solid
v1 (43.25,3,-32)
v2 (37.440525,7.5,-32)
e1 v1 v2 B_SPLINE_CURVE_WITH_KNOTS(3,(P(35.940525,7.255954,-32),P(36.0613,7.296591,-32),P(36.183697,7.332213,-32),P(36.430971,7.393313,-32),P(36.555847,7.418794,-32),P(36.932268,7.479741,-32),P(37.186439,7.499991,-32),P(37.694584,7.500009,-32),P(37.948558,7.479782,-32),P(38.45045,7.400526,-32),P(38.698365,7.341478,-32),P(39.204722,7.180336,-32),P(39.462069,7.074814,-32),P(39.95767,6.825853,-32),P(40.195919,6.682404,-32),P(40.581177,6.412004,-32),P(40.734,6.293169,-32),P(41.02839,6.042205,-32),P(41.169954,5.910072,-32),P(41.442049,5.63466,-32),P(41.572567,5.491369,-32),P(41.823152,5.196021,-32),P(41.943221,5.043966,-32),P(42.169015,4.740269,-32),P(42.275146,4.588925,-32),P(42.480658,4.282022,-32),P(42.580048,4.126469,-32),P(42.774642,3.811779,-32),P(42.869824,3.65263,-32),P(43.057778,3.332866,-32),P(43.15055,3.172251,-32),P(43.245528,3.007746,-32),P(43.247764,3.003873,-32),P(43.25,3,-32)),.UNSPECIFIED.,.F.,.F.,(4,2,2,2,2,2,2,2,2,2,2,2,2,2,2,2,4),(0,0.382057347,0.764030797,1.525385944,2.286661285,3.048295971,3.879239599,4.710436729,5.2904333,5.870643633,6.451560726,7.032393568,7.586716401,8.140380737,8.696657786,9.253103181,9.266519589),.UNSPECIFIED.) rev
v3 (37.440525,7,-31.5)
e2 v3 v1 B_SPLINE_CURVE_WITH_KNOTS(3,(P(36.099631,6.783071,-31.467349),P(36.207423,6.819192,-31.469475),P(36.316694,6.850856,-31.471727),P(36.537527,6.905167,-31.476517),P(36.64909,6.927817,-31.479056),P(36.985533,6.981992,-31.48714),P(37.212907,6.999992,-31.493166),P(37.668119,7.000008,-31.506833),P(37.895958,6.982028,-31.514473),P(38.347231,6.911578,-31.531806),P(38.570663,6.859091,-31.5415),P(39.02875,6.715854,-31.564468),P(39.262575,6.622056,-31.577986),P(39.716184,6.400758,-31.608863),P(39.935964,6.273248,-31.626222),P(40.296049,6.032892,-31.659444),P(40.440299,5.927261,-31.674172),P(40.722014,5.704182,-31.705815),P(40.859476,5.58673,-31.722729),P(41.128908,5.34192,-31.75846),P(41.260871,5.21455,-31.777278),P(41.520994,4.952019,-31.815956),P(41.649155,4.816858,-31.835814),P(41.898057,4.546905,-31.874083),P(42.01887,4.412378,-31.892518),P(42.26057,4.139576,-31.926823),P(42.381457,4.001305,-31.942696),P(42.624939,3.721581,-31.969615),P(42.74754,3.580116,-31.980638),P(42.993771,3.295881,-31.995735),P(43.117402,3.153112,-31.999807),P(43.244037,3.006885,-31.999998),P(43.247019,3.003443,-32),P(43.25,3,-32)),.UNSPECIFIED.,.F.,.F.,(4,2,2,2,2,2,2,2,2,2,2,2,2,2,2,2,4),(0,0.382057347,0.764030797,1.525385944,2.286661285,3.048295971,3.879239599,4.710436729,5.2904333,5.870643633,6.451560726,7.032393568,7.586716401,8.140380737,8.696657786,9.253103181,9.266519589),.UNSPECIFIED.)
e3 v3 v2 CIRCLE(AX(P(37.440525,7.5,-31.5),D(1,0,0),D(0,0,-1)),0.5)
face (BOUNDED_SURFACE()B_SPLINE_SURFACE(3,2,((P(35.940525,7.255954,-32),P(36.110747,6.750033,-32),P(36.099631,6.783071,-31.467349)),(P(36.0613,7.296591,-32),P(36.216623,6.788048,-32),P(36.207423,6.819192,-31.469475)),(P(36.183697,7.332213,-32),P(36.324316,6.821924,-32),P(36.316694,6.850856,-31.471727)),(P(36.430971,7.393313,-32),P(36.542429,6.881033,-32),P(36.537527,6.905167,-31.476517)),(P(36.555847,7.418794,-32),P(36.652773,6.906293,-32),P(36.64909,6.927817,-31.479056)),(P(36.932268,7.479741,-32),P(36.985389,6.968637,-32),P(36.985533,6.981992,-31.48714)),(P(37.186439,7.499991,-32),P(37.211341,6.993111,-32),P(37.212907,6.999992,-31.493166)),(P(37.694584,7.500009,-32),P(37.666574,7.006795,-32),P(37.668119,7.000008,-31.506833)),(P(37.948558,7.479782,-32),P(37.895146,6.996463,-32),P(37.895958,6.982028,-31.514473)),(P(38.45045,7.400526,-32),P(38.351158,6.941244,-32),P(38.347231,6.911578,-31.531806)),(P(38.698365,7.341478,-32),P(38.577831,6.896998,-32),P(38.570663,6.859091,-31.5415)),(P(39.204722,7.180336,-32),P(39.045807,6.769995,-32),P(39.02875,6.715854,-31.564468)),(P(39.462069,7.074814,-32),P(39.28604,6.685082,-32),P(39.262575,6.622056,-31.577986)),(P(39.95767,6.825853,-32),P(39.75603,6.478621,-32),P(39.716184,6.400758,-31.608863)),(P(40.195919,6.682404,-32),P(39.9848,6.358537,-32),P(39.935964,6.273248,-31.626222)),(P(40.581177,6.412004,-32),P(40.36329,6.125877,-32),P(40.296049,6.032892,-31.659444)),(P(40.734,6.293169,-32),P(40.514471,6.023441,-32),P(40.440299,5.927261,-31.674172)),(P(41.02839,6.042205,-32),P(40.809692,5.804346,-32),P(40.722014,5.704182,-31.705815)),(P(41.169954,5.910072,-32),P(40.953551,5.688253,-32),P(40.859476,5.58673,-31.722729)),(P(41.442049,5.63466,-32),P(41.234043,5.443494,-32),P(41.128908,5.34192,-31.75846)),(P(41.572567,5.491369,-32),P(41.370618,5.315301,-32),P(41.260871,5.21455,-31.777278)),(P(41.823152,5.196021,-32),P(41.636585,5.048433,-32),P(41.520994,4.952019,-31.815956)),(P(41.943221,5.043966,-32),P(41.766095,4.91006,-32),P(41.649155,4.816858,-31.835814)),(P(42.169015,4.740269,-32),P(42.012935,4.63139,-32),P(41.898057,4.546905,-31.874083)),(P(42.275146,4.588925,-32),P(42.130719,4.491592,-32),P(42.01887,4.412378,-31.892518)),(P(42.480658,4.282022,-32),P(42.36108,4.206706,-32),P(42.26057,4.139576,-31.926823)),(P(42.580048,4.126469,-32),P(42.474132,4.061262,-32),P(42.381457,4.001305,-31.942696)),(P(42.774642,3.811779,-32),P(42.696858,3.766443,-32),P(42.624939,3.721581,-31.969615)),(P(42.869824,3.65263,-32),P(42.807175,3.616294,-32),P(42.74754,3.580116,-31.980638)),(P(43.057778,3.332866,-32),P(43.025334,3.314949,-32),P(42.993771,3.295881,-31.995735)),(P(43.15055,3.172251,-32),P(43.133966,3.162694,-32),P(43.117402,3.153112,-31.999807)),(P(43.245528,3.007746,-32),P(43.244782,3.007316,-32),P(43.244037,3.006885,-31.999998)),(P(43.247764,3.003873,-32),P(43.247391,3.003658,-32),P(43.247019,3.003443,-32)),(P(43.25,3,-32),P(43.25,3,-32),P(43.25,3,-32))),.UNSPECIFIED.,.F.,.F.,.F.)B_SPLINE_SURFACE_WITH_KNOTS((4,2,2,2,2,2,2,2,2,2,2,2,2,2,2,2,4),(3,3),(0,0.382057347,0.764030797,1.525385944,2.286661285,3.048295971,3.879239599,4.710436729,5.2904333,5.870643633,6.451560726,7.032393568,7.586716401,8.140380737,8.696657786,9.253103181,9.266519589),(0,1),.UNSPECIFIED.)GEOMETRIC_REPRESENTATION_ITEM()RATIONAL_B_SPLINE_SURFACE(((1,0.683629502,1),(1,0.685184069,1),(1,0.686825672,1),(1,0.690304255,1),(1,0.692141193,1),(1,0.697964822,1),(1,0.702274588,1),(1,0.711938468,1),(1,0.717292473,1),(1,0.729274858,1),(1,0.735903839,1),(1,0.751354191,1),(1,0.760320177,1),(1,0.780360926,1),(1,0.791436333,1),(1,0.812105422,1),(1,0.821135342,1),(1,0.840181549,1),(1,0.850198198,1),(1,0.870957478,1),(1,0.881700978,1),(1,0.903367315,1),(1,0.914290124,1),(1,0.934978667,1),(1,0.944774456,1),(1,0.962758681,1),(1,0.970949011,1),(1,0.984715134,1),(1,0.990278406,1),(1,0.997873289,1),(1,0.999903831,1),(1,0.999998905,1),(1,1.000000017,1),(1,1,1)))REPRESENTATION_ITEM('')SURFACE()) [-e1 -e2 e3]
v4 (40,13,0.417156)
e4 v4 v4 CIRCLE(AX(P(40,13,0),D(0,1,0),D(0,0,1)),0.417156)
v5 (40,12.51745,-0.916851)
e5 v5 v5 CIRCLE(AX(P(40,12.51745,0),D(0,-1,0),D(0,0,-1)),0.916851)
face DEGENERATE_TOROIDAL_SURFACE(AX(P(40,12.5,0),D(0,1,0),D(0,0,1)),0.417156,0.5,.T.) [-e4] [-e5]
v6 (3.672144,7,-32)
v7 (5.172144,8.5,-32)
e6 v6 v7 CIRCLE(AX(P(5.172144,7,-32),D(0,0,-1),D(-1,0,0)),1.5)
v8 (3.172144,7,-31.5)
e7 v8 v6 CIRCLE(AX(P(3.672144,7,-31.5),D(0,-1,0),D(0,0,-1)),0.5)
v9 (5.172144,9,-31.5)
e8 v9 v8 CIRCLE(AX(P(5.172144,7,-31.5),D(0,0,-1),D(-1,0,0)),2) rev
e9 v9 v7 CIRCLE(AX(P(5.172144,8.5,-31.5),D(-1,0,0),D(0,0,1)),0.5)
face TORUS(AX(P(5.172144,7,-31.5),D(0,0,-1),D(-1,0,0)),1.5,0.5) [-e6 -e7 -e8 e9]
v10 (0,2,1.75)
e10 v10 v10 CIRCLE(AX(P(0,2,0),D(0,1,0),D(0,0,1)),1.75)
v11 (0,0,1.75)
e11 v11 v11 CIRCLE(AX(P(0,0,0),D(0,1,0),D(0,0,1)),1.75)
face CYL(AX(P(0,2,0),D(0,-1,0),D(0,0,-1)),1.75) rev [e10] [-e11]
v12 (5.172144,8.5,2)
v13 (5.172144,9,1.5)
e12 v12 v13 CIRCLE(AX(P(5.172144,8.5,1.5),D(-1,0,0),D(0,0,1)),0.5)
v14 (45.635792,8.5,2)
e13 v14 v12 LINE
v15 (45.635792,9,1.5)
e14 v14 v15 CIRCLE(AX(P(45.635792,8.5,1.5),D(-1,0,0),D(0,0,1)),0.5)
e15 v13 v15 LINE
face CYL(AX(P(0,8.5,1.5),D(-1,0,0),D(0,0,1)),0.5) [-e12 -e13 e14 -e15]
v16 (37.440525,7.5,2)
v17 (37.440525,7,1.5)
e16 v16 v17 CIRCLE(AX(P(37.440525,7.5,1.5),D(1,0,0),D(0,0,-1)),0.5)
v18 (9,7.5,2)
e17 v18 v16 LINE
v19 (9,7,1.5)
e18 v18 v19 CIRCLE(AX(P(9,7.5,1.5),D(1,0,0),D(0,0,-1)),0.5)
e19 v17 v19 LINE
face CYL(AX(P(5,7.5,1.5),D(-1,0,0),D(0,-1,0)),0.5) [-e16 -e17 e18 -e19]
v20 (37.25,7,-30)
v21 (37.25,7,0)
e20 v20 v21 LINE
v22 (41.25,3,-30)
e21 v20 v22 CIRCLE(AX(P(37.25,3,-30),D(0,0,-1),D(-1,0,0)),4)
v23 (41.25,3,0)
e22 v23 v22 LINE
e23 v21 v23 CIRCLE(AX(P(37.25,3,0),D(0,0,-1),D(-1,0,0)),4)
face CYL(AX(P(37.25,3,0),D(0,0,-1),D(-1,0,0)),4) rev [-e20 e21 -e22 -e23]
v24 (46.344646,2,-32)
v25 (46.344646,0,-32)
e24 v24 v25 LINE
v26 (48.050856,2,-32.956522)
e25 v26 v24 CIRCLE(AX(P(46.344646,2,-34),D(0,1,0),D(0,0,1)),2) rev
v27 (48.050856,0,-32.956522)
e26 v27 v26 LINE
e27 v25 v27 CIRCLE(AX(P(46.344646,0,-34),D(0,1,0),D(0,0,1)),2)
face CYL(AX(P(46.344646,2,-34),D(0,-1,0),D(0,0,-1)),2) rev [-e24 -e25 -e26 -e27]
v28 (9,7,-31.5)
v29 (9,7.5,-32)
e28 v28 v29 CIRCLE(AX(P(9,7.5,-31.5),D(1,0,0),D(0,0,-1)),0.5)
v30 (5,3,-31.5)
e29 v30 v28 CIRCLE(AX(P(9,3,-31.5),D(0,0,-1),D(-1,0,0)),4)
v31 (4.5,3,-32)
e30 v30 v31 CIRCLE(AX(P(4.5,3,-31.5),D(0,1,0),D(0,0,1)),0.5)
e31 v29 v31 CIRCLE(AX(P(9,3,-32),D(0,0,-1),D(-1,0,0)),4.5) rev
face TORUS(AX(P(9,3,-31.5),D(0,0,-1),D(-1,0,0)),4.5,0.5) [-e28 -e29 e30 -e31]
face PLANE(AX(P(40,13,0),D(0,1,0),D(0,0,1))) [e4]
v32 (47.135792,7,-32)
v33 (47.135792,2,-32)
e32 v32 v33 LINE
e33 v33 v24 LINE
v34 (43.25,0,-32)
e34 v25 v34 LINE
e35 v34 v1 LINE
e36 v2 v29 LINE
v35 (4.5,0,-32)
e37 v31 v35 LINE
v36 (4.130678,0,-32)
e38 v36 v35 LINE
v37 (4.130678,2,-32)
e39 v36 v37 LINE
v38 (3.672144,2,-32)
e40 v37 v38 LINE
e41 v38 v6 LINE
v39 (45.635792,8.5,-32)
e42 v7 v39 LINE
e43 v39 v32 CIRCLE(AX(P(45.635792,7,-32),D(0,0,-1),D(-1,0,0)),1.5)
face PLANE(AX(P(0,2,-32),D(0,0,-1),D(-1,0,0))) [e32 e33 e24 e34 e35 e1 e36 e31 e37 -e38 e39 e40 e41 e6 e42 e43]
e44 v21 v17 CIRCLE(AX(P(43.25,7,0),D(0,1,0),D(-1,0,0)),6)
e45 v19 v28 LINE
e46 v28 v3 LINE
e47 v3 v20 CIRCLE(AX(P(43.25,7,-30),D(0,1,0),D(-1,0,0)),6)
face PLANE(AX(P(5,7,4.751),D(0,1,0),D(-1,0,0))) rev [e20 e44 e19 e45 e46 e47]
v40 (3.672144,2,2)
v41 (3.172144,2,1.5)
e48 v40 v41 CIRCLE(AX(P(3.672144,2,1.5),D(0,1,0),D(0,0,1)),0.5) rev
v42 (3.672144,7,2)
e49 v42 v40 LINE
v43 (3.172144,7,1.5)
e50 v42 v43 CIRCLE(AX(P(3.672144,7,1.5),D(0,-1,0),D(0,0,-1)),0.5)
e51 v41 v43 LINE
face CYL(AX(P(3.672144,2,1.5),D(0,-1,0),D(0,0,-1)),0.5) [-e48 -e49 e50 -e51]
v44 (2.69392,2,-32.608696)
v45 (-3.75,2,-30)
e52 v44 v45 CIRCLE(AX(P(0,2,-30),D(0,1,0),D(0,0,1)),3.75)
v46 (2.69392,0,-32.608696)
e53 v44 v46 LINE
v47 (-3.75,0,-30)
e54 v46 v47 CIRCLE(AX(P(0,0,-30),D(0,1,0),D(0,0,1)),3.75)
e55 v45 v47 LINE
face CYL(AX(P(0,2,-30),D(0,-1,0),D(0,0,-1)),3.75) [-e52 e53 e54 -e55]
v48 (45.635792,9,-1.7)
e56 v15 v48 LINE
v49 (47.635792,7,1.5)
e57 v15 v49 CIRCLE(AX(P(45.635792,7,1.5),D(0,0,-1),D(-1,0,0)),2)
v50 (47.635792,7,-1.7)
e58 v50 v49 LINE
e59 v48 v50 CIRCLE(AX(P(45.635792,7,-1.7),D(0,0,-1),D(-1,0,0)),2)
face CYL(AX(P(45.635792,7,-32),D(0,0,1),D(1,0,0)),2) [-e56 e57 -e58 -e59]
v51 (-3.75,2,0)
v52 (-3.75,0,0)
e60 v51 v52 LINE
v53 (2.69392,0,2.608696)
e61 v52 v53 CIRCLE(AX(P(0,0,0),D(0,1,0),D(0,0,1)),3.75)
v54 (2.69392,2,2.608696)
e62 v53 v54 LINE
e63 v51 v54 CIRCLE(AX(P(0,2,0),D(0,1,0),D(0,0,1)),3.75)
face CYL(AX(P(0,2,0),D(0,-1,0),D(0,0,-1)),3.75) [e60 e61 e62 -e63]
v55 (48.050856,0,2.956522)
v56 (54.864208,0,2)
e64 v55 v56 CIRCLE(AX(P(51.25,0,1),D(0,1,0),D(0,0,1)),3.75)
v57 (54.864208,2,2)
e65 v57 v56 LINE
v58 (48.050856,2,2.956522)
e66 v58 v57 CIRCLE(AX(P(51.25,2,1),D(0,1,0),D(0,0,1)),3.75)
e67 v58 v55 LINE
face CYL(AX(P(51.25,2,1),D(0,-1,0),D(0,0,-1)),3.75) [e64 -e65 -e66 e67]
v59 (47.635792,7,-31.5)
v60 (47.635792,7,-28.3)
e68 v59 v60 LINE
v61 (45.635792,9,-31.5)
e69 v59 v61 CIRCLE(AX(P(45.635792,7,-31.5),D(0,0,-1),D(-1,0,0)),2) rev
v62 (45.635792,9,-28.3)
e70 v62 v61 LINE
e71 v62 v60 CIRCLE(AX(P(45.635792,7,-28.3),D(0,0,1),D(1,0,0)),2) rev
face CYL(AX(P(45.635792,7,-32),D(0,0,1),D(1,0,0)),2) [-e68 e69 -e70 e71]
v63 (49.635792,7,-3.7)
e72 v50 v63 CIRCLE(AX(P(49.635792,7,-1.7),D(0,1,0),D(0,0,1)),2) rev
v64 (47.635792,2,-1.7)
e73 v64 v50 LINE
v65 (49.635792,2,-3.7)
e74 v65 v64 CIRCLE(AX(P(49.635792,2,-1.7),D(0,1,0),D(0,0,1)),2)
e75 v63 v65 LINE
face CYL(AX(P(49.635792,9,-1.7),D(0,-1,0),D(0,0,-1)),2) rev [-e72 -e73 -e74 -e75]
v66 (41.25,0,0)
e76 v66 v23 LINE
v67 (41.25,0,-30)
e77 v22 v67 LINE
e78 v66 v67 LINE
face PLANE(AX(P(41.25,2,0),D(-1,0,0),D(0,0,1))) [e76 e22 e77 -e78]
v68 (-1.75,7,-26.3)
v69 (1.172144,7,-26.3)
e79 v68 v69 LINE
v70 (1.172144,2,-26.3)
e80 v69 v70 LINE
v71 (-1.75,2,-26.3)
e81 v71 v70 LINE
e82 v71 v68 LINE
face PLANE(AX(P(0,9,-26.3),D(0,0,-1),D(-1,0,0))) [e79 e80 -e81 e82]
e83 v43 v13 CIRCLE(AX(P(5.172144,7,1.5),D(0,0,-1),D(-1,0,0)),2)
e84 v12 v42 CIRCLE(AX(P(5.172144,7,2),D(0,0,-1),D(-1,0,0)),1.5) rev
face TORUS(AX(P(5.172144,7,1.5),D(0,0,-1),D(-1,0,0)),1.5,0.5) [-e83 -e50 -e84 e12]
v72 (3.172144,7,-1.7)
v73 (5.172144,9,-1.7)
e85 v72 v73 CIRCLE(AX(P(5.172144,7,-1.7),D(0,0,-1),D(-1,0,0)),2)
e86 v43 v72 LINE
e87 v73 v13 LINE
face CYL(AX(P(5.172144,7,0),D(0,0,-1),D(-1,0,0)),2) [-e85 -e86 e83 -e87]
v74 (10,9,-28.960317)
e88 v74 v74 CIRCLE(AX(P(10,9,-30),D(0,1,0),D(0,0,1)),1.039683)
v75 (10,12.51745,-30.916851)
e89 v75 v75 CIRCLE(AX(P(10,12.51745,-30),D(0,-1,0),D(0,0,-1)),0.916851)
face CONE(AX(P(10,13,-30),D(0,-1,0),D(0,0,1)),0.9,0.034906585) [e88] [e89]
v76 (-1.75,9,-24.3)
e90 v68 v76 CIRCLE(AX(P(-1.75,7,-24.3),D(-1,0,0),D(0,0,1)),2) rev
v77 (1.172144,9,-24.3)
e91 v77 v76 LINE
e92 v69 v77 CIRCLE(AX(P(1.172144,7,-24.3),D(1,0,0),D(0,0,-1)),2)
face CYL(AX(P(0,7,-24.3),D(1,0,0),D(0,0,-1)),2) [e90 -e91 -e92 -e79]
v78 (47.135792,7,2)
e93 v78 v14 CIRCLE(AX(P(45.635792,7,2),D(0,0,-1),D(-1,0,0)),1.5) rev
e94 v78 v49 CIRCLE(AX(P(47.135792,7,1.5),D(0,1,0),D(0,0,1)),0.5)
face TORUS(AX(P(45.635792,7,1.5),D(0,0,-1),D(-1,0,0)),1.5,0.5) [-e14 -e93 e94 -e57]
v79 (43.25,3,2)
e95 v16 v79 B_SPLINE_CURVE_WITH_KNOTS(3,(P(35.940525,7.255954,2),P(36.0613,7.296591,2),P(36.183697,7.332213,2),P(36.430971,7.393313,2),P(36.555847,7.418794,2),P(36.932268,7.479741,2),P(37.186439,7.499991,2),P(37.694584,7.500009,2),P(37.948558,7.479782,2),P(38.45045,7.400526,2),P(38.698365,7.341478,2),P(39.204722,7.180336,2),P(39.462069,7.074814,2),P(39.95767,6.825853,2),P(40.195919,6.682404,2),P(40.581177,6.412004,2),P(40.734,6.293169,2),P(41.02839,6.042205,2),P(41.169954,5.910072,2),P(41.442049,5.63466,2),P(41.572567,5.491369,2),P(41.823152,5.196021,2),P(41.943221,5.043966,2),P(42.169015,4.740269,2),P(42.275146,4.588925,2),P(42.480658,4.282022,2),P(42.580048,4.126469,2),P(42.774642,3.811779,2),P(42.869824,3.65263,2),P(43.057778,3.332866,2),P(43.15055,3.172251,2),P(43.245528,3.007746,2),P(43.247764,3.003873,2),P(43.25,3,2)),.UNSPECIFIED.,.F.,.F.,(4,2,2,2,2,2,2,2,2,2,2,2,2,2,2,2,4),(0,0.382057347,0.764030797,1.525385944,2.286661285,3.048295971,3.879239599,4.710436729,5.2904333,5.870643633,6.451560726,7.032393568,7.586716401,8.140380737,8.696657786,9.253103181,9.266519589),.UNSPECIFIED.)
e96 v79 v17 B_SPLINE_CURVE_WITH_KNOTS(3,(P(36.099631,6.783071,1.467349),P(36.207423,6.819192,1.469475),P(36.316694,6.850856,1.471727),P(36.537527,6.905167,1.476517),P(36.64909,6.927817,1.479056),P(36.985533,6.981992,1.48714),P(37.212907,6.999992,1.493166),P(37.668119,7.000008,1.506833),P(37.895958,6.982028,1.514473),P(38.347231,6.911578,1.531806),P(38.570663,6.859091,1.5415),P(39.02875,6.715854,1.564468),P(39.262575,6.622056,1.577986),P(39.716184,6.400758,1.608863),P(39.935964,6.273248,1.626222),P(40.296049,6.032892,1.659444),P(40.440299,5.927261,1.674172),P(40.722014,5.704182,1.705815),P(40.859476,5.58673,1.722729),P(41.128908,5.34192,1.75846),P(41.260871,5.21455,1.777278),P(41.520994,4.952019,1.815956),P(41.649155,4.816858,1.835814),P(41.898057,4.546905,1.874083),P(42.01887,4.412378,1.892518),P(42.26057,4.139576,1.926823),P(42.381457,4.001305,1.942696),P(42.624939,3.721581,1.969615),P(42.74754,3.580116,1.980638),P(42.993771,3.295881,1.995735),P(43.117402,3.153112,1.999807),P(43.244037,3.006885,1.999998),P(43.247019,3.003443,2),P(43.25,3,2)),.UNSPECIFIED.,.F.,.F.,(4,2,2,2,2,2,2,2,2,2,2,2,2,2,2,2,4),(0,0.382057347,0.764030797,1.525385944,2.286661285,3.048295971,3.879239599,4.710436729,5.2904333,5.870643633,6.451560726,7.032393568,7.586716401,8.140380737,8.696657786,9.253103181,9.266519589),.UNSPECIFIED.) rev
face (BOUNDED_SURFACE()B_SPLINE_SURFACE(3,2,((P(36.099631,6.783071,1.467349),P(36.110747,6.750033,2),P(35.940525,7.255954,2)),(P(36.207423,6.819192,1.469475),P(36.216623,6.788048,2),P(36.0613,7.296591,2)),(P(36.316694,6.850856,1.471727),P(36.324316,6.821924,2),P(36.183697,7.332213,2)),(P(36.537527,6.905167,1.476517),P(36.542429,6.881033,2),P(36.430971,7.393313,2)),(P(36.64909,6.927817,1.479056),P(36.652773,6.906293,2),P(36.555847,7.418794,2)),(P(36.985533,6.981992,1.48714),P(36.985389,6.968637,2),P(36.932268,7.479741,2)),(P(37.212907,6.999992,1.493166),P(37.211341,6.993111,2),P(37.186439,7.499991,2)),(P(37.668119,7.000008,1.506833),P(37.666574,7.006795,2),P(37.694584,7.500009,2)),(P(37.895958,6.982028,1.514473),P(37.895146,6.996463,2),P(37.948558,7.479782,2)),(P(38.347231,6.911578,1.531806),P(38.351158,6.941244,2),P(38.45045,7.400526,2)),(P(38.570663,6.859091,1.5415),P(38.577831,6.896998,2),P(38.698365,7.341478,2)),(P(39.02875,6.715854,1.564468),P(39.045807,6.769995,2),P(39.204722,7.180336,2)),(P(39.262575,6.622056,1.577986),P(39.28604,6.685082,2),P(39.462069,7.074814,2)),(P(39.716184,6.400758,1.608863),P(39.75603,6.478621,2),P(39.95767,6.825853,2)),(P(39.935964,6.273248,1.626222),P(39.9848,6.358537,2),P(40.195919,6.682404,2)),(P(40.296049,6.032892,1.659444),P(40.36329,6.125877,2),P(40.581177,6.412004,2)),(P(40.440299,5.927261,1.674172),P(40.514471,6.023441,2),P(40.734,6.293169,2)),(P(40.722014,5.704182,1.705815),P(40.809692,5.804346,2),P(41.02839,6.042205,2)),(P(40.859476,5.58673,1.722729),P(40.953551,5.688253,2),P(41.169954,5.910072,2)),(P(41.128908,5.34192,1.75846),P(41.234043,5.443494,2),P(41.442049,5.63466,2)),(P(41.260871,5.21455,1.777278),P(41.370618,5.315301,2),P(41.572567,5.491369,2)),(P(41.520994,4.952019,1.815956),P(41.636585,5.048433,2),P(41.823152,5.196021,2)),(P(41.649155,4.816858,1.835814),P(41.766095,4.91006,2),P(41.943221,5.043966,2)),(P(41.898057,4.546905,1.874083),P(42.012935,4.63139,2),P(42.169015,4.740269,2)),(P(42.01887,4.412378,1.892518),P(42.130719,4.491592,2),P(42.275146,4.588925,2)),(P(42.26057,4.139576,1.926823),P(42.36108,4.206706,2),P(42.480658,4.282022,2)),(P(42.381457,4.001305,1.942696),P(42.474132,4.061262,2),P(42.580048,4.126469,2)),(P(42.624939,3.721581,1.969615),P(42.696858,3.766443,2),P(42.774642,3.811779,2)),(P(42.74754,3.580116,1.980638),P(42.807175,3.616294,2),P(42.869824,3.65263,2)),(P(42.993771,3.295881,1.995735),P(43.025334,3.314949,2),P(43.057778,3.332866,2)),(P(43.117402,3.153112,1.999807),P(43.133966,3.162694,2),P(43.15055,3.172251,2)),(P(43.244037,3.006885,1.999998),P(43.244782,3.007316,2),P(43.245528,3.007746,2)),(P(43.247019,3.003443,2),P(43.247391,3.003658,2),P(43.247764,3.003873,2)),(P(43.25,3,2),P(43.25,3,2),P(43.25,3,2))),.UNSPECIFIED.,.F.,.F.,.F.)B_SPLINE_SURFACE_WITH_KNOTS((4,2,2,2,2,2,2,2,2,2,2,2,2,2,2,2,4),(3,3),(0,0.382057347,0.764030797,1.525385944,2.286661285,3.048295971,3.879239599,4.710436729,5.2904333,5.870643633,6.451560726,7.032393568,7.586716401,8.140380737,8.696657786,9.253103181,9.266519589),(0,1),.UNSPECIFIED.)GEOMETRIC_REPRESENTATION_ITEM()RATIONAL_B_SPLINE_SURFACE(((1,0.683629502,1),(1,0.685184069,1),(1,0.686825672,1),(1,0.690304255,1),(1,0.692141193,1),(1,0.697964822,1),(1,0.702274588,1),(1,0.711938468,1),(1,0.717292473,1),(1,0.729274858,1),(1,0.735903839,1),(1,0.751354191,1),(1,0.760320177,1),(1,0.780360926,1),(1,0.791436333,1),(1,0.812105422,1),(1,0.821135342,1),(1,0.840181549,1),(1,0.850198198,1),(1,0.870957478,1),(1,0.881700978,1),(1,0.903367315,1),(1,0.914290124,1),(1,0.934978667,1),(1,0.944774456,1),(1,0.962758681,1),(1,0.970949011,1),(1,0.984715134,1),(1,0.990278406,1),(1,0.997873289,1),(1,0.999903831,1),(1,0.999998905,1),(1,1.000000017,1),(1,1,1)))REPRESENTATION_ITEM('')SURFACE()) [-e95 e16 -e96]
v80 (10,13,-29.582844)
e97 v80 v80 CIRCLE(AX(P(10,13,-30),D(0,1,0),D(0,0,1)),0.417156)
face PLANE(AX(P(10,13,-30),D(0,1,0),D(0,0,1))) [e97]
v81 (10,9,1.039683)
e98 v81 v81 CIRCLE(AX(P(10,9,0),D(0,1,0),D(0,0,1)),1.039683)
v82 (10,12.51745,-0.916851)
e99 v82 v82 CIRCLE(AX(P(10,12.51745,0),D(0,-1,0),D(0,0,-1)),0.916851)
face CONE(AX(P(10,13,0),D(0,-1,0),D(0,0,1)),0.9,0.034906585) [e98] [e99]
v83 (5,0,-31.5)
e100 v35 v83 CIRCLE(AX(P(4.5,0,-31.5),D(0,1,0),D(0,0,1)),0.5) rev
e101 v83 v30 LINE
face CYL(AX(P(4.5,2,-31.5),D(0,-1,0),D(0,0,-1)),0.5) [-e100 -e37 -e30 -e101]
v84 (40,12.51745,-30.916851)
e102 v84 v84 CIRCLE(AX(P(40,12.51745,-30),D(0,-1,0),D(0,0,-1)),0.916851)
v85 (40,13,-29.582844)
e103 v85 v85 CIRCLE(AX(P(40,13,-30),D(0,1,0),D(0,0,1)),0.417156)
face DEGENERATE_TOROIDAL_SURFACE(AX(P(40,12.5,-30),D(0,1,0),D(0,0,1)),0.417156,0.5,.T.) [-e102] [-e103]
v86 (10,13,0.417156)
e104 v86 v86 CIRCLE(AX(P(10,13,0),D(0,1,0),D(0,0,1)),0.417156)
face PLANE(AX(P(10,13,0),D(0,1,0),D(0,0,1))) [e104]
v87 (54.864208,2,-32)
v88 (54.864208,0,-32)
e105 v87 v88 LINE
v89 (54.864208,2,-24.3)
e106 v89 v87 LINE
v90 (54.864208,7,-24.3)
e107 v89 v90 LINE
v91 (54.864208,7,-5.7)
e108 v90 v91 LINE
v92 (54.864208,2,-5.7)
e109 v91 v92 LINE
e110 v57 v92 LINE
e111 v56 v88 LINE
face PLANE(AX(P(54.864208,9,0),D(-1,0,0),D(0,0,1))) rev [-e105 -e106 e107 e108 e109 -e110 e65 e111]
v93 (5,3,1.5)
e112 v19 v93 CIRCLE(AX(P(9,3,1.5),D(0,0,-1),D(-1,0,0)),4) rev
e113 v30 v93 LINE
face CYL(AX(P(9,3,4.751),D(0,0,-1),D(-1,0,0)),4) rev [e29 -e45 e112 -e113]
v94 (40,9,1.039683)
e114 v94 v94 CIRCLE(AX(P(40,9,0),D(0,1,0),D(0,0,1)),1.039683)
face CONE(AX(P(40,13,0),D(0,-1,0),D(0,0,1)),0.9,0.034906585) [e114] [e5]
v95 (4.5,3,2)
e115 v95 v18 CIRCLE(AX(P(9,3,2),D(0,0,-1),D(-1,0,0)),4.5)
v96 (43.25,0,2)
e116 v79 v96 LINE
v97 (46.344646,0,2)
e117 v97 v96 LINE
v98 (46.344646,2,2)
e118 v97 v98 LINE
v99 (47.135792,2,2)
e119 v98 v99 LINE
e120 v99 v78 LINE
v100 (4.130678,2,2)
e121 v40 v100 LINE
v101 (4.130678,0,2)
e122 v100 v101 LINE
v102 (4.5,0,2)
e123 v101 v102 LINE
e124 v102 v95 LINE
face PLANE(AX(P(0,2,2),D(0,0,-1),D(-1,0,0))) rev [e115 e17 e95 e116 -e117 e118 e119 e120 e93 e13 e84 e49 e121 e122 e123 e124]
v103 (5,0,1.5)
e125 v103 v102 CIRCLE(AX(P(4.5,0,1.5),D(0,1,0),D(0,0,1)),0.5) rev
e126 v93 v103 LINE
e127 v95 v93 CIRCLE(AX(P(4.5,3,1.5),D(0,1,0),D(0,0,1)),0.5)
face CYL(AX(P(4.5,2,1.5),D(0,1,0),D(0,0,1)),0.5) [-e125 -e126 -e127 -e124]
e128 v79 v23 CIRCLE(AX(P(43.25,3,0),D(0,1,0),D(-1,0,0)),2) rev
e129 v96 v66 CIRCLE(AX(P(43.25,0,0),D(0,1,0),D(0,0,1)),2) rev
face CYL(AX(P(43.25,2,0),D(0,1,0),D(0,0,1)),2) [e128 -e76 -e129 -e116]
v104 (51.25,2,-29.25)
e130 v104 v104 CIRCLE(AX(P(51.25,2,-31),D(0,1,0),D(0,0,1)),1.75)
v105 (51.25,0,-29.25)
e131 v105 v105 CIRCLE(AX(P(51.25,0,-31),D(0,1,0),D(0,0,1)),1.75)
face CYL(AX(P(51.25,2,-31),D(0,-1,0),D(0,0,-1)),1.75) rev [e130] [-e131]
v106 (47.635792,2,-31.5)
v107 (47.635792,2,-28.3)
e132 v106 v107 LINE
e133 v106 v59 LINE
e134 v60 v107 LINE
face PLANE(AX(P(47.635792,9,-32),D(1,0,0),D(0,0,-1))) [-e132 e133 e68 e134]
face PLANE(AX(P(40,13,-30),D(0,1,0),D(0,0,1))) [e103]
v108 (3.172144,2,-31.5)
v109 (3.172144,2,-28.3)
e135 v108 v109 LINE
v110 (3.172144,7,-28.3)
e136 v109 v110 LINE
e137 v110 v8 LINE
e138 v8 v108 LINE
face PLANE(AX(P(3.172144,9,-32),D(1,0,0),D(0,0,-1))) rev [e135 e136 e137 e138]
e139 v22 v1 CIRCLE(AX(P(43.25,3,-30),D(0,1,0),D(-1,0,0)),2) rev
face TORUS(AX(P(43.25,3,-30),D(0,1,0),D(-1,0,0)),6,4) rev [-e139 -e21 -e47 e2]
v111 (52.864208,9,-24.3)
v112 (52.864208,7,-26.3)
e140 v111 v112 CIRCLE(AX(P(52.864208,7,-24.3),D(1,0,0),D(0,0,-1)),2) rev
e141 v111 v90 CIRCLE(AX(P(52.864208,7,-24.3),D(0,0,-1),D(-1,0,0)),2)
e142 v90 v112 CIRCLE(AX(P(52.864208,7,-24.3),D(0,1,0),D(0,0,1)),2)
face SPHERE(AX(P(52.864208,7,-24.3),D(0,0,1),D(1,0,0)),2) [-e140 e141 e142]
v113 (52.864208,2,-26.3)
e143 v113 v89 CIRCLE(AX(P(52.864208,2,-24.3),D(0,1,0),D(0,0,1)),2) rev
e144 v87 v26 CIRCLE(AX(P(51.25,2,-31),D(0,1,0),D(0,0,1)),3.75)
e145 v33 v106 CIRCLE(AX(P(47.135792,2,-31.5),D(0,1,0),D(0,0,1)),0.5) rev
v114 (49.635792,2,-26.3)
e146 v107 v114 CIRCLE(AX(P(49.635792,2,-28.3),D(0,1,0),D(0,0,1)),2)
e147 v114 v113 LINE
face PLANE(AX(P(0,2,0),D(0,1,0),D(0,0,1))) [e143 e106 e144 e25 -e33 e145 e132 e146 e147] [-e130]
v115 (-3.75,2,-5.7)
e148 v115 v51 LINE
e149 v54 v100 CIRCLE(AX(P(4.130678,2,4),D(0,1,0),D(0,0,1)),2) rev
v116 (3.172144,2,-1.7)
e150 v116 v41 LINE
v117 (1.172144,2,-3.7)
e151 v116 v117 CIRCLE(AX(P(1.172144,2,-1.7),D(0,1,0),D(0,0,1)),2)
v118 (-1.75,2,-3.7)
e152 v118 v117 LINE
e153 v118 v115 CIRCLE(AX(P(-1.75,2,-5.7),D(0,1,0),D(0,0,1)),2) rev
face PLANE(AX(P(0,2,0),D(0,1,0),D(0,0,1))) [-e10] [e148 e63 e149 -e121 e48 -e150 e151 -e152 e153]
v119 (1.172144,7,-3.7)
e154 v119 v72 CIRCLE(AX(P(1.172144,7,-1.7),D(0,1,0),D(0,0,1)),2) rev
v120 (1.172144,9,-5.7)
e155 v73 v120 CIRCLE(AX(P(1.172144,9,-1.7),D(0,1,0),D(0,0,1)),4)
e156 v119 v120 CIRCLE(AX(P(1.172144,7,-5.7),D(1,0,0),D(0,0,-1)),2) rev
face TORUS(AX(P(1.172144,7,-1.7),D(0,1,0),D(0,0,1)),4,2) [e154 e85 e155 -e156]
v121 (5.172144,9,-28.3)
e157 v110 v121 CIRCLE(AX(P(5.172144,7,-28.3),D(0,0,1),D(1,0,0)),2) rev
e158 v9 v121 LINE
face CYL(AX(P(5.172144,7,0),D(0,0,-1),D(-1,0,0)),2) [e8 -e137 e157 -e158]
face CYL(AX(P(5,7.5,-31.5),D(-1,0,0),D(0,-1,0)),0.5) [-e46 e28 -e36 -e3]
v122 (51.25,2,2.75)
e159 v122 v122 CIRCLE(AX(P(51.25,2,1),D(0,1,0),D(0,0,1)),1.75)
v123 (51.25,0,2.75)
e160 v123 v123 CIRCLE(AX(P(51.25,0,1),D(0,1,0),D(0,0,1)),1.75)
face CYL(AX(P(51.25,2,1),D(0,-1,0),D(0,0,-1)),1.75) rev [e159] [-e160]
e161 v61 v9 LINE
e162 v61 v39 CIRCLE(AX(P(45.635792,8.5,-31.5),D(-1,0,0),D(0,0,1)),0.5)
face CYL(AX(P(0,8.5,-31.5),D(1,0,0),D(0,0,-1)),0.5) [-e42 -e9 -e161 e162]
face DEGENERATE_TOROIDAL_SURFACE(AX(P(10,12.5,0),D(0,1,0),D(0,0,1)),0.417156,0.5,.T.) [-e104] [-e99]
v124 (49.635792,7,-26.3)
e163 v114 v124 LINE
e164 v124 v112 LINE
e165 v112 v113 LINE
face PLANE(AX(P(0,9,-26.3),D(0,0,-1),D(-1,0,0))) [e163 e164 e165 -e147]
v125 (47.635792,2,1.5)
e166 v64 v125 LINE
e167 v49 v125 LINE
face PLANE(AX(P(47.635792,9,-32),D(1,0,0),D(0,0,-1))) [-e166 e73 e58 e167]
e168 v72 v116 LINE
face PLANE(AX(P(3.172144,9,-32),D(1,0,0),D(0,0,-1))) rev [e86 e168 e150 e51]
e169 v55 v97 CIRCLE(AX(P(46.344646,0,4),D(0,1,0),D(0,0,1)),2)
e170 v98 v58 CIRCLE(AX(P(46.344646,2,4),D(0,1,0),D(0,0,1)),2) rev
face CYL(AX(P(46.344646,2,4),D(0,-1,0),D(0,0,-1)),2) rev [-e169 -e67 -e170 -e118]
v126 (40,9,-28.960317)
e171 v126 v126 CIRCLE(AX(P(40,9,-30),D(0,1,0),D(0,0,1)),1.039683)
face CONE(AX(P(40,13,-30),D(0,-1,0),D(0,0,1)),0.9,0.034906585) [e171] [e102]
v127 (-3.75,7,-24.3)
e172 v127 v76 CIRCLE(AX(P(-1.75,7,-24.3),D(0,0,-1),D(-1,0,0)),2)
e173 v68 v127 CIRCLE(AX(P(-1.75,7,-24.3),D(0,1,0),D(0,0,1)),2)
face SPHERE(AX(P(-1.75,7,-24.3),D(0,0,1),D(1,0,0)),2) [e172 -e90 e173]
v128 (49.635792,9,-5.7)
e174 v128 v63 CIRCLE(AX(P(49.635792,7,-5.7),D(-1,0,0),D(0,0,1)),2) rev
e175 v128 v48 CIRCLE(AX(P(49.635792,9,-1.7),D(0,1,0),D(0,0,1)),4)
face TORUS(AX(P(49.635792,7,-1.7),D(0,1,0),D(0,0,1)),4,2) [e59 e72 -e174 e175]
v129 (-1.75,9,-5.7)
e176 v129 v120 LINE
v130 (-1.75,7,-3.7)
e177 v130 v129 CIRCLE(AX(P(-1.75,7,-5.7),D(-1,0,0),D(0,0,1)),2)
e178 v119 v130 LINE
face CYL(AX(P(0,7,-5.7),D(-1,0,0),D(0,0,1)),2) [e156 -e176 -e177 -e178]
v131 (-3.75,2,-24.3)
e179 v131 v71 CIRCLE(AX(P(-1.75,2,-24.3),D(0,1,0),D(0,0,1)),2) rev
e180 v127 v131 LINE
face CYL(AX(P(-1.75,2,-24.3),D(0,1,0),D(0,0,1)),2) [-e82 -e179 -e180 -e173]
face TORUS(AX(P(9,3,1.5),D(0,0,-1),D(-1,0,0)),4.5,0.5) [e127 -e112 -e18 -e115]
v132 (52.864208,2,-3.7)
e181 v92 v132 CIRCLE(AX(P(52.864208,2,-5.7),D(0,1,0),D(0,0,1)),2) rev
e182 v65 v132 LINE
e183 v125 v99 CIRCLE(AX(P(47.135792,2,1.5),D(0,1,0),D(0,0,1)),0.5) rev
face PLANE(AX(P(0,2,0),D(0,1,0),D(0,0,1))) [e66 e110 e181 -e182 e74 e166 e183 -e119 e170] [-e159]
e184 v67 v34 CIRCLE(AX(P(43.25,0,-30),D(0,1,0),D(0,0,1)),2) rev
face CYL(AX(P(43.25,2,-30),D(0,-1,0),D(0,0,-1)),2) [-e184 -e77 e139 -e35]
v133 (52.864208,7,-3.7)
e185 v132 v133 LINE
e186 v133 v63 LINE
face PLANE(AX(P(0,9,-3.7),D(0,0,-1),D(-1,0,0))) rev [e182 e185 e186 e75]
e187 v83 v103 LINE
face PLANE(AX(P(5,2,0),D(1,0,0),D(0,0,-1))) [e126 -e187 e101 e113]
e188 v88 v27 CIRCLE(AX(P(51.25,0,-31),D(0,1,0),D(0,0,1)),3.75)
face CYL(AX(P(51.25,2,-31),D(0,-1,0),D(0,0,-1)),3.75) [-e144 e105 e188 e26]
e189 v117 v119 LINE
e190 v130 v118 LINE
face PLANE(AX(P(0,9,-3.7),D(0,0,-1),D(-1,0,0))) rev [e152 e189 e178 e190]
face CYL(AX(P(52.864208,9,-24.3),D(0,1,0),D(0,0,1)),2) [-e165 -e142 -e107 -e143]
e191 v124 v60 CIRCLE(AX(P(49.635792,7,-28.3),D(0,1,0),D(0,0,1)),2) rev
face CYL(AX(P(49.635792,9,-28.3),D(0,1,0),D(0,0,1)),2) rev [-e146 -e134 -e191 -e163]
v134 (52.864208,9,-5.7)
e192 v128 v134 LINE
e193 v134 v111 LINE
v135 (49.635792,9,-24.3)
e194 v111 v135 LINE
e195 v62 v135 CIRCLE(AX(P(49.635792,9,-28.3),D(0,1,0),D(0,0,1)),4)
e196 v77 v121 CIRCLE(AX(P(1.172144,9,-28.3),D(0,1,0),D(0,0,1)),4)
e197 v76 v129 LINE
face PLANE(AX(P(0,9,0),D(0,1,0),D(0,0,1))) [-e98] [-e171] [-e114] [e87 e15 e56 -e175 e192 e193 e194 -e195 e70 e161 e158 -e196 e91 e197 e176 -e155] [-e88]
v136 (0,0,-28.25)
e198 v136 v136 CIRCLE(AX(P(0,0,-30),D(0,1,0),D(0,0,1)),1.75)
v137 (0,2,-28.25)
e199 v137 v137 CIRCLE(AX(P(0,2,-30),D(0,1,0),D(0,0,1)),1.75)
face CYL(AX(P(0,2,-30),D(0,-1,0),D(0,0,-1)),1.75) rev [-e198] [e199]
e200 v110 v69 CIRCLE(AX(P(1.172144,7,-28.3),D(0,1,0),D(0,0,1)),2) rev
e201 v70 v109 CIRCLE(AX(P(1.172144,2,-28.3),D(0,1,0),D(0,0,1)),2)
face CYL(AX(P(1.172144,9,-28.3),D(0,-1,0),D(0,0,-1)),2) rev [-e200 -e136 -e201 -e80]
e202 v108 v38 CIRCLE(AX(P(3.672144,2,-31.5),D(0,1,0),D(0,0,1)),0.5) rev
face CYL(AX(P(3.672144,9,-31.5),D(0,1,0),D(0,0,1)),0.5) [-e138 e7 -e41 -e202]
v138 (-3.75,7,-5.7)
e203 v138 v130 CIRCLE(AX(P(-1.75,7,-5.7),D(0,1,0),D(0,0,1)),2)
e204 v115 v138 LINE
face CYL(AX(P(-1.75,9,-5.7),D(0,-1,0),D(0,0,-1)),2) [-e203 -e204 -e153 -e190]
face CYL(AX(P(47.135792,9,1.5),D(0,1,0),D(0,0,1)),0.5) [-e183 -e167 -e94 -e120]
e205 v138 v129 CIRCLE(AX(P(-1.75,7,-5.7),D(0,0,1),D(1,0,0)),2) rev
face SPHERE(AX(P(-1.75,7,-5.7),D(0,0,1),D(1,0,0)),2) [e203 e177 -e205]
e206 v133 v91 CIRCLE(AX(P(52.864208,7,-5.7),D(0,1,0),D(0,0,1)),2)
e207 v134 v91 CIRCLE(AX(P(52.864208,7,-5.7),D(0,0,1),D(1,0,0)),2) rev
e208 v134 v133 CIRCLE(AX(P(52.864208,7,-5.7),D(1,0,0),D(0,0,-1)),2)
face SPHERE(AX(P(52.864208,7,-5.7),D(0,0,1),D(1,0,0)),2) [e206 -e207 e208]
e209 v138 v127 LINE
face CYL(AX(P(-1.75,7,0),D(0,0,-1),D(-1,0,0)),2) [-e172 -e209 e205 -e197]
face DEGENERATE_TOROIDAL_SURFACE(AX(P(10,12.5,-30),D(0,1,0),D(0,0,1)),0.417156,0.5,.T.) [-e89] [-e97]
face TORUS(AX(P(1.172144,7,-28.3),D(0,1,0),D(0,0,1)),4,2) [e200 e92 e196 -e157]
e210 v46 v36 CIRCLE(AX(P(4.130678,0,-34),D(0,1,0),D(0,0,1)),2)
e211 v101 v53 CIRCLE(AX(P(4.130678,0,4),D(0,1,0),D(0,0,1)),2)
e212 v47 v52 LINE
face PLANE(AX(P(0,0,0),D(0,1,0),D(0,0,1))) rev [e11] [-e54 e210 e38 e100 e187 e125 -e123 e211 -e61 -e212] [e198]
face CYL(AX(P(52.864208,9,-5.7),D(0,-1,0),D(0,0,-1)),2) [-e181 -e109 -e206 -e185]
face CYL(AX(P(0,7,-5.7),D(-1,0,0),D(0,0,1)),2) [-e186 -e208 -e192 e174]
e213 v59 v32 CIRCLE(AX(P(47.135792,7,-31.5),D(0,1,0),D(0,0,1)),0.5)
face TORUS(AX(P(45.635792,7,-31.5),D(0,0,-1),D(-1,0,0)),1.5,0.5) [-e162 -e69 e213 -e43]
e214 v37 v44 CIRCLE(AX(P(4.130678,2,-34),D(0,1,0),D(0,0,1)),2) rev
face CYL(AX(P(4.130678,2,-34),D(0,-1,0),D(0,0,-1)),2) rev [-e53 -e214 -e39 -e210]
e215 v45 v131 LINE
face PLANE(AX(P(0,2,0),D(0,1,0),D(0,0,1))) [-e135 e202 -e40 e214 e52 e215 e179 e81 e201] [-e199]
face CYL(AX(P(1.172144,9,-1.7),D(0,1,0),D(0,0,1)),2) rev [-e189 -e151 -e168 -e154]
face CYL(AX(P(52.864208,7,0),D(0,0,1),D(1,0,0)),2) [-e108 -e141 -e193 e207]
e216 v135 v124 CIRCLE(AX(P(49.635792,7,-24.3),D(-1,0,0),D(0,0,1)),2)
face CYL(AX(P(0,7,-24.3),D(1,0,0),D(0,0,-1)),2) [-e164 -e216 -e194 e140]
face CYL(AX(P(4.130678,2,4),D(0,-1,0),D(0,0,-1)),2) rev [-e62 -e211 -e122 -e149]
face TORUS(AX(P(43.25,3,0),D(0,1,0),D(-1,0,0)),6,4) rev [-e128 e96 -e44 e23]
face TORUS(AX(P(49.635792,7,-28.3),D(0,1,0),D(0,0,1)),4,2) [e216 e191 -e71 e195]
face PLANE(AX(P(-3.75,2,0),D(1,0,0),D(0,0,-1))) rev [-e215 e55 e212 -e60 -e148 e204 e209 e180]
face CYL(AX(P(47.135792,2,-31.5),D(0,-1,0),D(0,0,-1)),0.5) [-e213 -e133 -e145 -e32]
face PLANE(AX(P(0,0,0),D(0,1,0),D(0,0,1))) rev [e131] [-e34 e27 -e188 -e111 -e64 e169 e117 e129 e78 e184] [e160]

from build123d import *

# Parameters (mm, degrees)
SKETCH1_R             = 1.75
BOSS_EXTRUDE1_DEPTH   = 2
BOSS_EXTRUDE1_2_DEPTH = 2
BOSS_EXTRUDE2_DEPTH   = 7
CUT_EXTRUDE1_REACH    = 68.646
SKETCH4_W             = 36.25
SKETCH4_H             = 7
SKETCH5_R             = 0.9
BOSS_EXTRUDE3_DEPTH   = 4
FILLET1_R             = 2
FILLET2_R             = 4
FILLET3_R             = 0.5
DRAFT4_ANGLE          = 2
FILLET4_R             = 0.5


with BuildPart() as part:
    # Sketch1 → Boss-Extrude1 (new body)
    with BuildSketch(Plane(origin=(0, 0, 0), x_dir=(1, 0, 0), z_dir=(0, 1, 0))):
        with BuildLine():
            Line((-3.75, 30), (-3.75, 0))
            ThreePointArc((-3.75, 0), (-1.040903107, -3.602640798), (3.172144385, -2))
            Line((3.172144385, -2), (5, -2))
            Line((5, -2), (5, 32))
            Line((5, 32), (3.172144385, 32))
            ThreePointArc((3.172144385, 32), (-1.040903107, 33.602640798), (-3.75, 30))
        make_face()
        with Locations(Location((0, 30, 0), (0, 0, 270))):
            Circle(SKETCH1_R, mode=Mode.SUBTRACT)
        with Locations(Location((0, 0, 0), (0, 0, 270))):
            Circle(SKETCH1_R, mode=Mode.SUBTRACT)
    extrude(amount=BOSS_EXTRUDE1_DEPTH)



with BuildPart() as body_2:
    # Sketch1 → Boss-Extrude1 2 (new body)
    with BuildSketch(Plane(origin=(0, 0, 0), x_dir=(1, 0, 0), z_dir=(0, 1, 0))):
        with BuildLine():
            Line((54.864208074, -2), (54.864208074, 32))
            ThreePointArc((54.864208074, 32), (51.25, 34.75), (47.635791926, 32))
            Line((47.635791926, 32), (41.25, 32))
            Line((41.25, 32), (41.25, -2))
            Line((41.25, -2), (47.635791926, -2))
            ThreePointArc((47.635791926, -2), (51.25, -4.75), (54.864208074, -2))
        make_face()
        with Locations(Location((51.25, 31, 0), (0, 0, 270))):
            Circle(SKETCH1_R, mode=Mode.SUBTRACT)
        with Locations(Location((51.25, -1, 0), (0, 0, 270))):
            Circle(SKETCH1_R, mode=Mode.SUBTRACT)
    extrude(amount=BOSS_EXTRUDE1_2_DEPTH)


with BuildPart() as part_1:
    add(part.part)

    add(body_2.part)  # Boss-Extrude2 merges body 2
    # Sketch3 → Boss-Extrude2 (add)
    with BuildSketch(Plane(origin=(0, 2, 0), x_dir=(1, 0, 0), z_dir=(0, 1, 0))):
        Polygon((47.635791926, 32), (3.172144385, 32), (3.172144385, 26.3), (-3.75, 26.3), (-3.75, 3.7), (3.172144385, 3.7), (3.172144385, -2), (47.635791926, -2), (47.635791926, 3.7), (54.864208074, 3.7), (54.864208074, 26.3), (47.635791926, 26.3), align=None)
    extrude(amount=BOSS_EXTRUDE2_DEPTH)

    # Sketch4 → Cut-Extrude1 (cut, up to next)
    with BuildSketch(Plane(origin=(0, 0, -32), x_dir=(-1, 0, 0), z_dir=(0, 0, -1)), mode=Mode.PRIVATE) as cut_extrude1_sk1:
        with Locations((-23.125, 3.5)):
            Rectangle(SKETCH4_W, SKETCH4_H)
    cut_extrude1_tool1 = extrude(cut_extrude1_sk1.sketch, amount=-CUT_EXTRUDE1_REACH, mode=Mode.PRIVATE) & part_1.part
    add(cut_extrude1_tool1.solids().sort_by_distance((23.125, 3.5, -32))[0], mode=Mode.SUBTRACT)

    # Sketch5 → Boss-Extrude3 (add)
    with BuildSketch(Plane(origin=(0, 9, 0), x_dir=(1, 0, 0), z_dir=(0, 1, 0))):
        with Locations(Location((10, 30, 0), (0, 0, 270))):
            Circle(SKETCH5_R)
        with Locations(Location((10, 0, 0), (0, 0, 270))):
            Circle(SKETCH5_R)
        with Locations(Location((40, 0, 0), (0, 0, 270))):
            Circle(SKETCH5_R)
        with Locations(Location((40, 30, 0), (0, 0, 270))):
            Circle(SKETCH5_R)
    extrude(amount=BOSS_EXTRUDE3_DEPTH)

    # Fillet1
    # the kernel refuses this fillet: 2 mm, written as the material it adds along each edge
    with BuildSketch(Plane(origin=(47.635791926, 0, -32), x_dir=(-1, 0, 0), z_dir=(0, 1, 0))) as fillet1_piece_1:
        with BuildLine():
            CenterArc((1.291146144, -2), FILLET1_R, 90, 58.551018611)
            ThreePointArc((-0.415064019, -0.956521739), (-0.17412446, -0.492757426), (0, 0))
            Line((0, 0), (1.291146144, 0))
        make_face()
    extrude(amount=2)
    with BuildSketch(Plane(origin=(47.635791926, 0, 2), x_dir=(-1, 0, 0), z_dir=(0, 1, 0))) as fillet1_piece_2:
        with BuildLine():
            CenterArc((1.291146144, 2), FILLET1_R, 211.448981389, 58.551018611)
            ThreePointArc((-0.415064019, 0.956521739), (-0.17412446, 0.492757426), (0, 0))
            Line((0, 0), (1.291146144, 0))
        make_face()
    extrude(amount=2)
    with BuildSketch(Plane(origin=(3.172144385, 0, 2), x_dir=(-0.6177921091095272, 0, 0.7863414715770763), z_dir=(0, 1, 0))) as fillet1_piece_3:
        with BuildLine():
            CenterArc((0.980508495, 1.989318881), FILLET1_R, 218.155081242, 45.920790152)
            Line((-0.592174448, 0.753734663), (0, 0))
            ThreePointArc((0, 0), (0.387042827, 0.020027098), (0.774085654, 0))
        make_face()
    extrude(amount=2)
    with BuildSketch(Plane(origin=(3.172144385, 0, -32), x_dir=(-0.617792109109531, 0, -0.7863414715770733), z_dir=(0, 1, 0))) as fillet1_piece_4:
        with BuildLine():
            CenterArc((0.980508495, -1.989318881), FILLET1_R, 95.924128606, 45.920790152)
            Line((-0.592174448, -0.753734663), (0, 0))
            ThreePointArc((0, 0), (0.387042827, -0.020027098), (0.774085654, 0))
        make_face()
    extrude(amount=2)
    with BuildSketch(Plane(origin=(3.172144385, 2, -26.3), x_dir=(0, 0, -1), z_dir=(0, 1, 0)), Plane(origin=(3.172144385, 2, -3.7), x_dir=(-1, 0, 0), z_dir=(0, 1, 0))) as fillet1_piece_5:
        with BuildLine():
            CenterArc((FILLET1_R, FILLET1_R), FILLET1_R, 180, 90)
            Line((0, FILLET1_R), (0, 0))
            Line((0, 0), (FILLET1_R, 0))
        make_face()
    extrude(amount=7)
    with BuildSketch(Plane(origin=(47.635791926, 2, -26.3), x_dir=(0, 0, -1), z_dir=(0, 1, 0)), Plane(origin=(47.635791926, 2, -3.7), x_dir=(1, 0, 0), z_dir=(0, 1, 0))) as fillet1_piece_6:
        with BuildLine():
            CenterArc((FILLET1_R, -FILLET1_R), FILLET1_R, 90, 90)
            Line((0, -FILLET1_R), (0, 0))
            Line((0, 0), (FILLET1_R, 0))
        make_face()
    extrude(amount=7)
    # the kernel refuses this fillet: 2 mm, written as the material it takes off along each edge
    with BuildSketch(Plane(origin=(41.25, -5, 2), x_dir=(1, 0, 0), z_dir=(0, 1, 0)), Plane(origin=(-3.75, 2, -26.3), x_dir=(0, 0, 1), z_dir=(0, 1, 0))) as fillet1_2_piece_1:
        with BuildLine():
            CenterArc((FILLET1_R, FILLET1_R), FILLET1_R, 180, 90)
            Line((0, FILLET1_R), (0, 0))
            Line((0, 0), (FILLET1_R, 0))
        make_face()
    extrude(amount=12, mode=Mode.SUBTRACT)
    with BuildSketch(Plane(origin=(41.25, -5, -32), x_dir=(1, 0, 0), z_dir=(0, 1, 0)), Plane(origin=(54.864208074, 2, -3.7), x_dir=(-1, 0, 0), z_dir=(0, 1, 0)), Plane(origin=(54.864208074, 2, -26.3), x_dir=(0, 0, 1), z_dir=(0, 1, 0)), Plane(origin=(-3.75, 2, -3.7), x_dir=(0, 0, -1), z_dir=(0, 1, 0))) as fillet1_2_piece_2:
        with BuildLine():
            CenterArc((FILLET1_R, -FILLET1_R), FILLET1_R, 90, 90)
            Line((0, -FILLET1_R), (0, 0))
            Line((0, 0), (FILLET1_R, 0))
        make_face()
    extrude(amount=12, mode=Mode.SUBTRACT)
    with BuildSketch(Plane(origin=(54.864208074, 9, 1.3), x_dir=(-1, 0, 0), z_dir=(0, 0, -1))) as fillet1_2_piece_3:
        with BuildLine():
            CenterArc((FILLET1_R, -FILLET1_R), FILLET1_R, 90, 90)
            Line((0, -FILLET1_R), (0, 0))
            Line((0, 0), (FILLET1_R, 0))
        make_face()
    extrude(amount=32.6, mode=Mode.SUBTRACT)
    with BuildSketch(Plane(origin=(-3.75, 9, -31.3), x_dir=(0, -1, 0), z_dir=(0, 0, 1))) as fillet1_2_piece_4:
        with BuildLine():
            CenterArc((FILLET1_R, FILLET1_R), FILLET1_R, 180, 90)
            Line((0, FILLET1_R), (0, 0))
            Line((0, 0), (FILLET1_R, 0))
        make_face()
    extrude(amount=32.6, mode=Mode.SUBTRACT)
    # the kernel refuses this fillet: 2 mm, written as the material it takes off along each edge
    with BuildSketch(Plane(origin=(-1.75, 7, -5.7), x_dir=(0, 1, 0), z_dir=(0, 0, 1))) as fillet1_3_piece_1_section:
        Polygon((0, 0), (FILLET1_R * 1.02, 0), (FILLET1_R * 1.02, FILLET1_R * 1.02), (0, FILLET1_R * 1.02), align=None)
    fillet1_3_piece_1 = extrude(amount=FILLET1_R * 1.02, mode=Mode.PRIVATE)
    fillet1_3_piece_1 = fillet1_3_piece_1 - Plane(origin=(-1.75, 7, -5.7), x_dir=(0.7071067811865475, -0.7071067811865475, 0), z_dir=(0, 0, 1)) * Sphere(FILLET1_R, mode=Mode.PRIVATE)
    add(fillet1_3_piece_1, mode=Mode.SUBTRACT)
    with BuildSketch(Plane(origin=(-1.75, 7, -24.3), x_dir=(0, 1, 0), z_dir=(0, 0, -1))) as fillet1_3_piece_2_section:
        Polygon((0, 0), (FILLET1_R * 1.02, 0), (FILLET1_R * 1.02, -FILLET1_R * 1.02), (0, -FILLET1_R * 1.02), align=None)
    fillet1_3_piece_2 = extrude(amount=FILLET1_R * 1.02, mode=Mode.PRIVATE)
    fillet1_3_piece_2 = fillet1_3_piece_2 - Plane(origin=(-1.75, 7, -24.3), x_dir=(0.7071067811865475, -0.7071067811865475, 0), z_dir=(0, 0, -1)) * Sphere(FILLET1_R, mode=Mode.PRIVATE)
    add(fillet1_3_piece_2, mode=Mode.SUBTRACT)
    with BuildSketch(Plane(origin=(52.864208074, 7, -5.7), x_dir=(0, 1, 0), z_dir=(0, 0, 1))) as fillet1_3_piece_3_section:
        Polygon((0, 0), (FILLET1_R * 1.02, 0), (FILLET1_R * 1.02, -FILLET1_R * 1.02), (0, -FILLET1_R * 1.02), align=None)
    fillet1_3_piece_3 = extrude(amount=FILLET1_R * 1.02, mode=Mode.PRIVATE)
    fillet1_3_piece_3 = fillet1_3_piece_3 - Plane(origin=(52.864208074, 7, -5.7), x_dir=(-0.7071067811865475, -0.7071067811865475, 0), z_dir=(0, 0, 1)) * Sphere(FILLET1_R, mode=Mode.PRIVATE)
    add(fillet1_3_piece_3, mode=Mode.SUBTRACT)
    with BuildSketch(Plane(origin=(52.864208074, 7, -24.3), x_dir=(0, 1, 0), z_dir=(0, 0, -1))) as fillet1_3_piece_4_section:
        Polygon((0, 0), (FILLET1_R * 1.02, 0), (FILLET1_R * 1.02, FILLET1_R * 1.02), (0, FILLET1_R * 1.02), align=None)
    fillet1_3_piece_4 = extrude(amount=FILLET1_R * 1.02, mode=Mode.PRIVATE)
    fillet1_3_piece_4 = fillet1_3_piece_4 - Plane(origin=(52.864208074, 7, -24.3), x_dir=(-0.7071067811865475, -0.7071067811865475, 0), z_dir=(0, 0, -1)) * Sphere(FILLET1_R, mode=Mode.PRIVATE)
    add(fillet1_3_piece_4, mode=Mode.SUBTRACT)
    with BuildSketch(Plane(origin=(47.635791926, 9, -28.3), x_dir=(-1, 0, 0), z_dir=(0, 0, -1))) as fillet1_3_piece_5:
        with BuildLine():
            CenterArc((FILLET1_R, -FILLET1_R), FILLET1_R, 90, 90)
            Line((0, -FILLET1_R), (0, 0))
            Line((0, 0), (FILLET1_R, 0))
        make_face()
    extrude(amount=8.7, mode=Mode.SUBTRACT)
    with BuildSketch(Plane(origin=(47.635791926, 9, 7), x_dir=(0, -1, 0), z_dir=(0, 0, -1)), Plane(origin=(3.172144385, 9, -37), x_dir=(0, -1, 0), z_dir=(0, 0, 1)), Plane(origin=(3.172144385, 9, -1.7), x_dir=(0, -1, 0), z_dir=(0, 0, 1))) as fillet1_3_piece_6:
        with BuildLine():
            CenterArc((FILLET1_R, FILLET1_R), FILLET1_R, 180, 90)
            Line((0, FILLET1_R), (0, 0))
            Line((0, 0), (FILLET1_R, 0))
        make_face()
    extrude(amount=8.7, mode=Mode.SUBTRACT)
    with BuildSketch(Plane(origin=(52.864208074, 9, -26.3), x_dir=(0, -1, 0), z_dir=(-1, 0, 0)), Plane(origin=(49.635791926, 9, -3.7), x_dir=(0, -1, 0), z_dir=(1, 0, 0))) as fillet1_3_piece_7:
        with BuildLine():
            CenterArc((FILLET1_R, FILLET1_R), FILLET1_R, 180, 90)
            Line((0, FILLET1_R), (0, 0))
            Line((0, 0), (FILLET1_R, 0))
        make_face()
    extrude(amount=3.228416147, mode=Mode.SUBTRACT)
    with BuildSketch(Plane(origin=(1.172144385, 9, -26.3), x_dir=(0, -1, 0), z_dir=(-1, 0, 0)), Plane(origin=(-1.75, 9, -3.7), x_dir=(0, -1, 0), z_dir=(1, 0, 0))) as fillet1_3_piece_8:
        with BuildLine():
            CenterArc((FILLET1_R, FILLET1_R), FILLET1_R, 180, 90)
            Line((0, FILLET1_R), (0, 0))
            Line((0, 0), (FILLET1_R, 0))
        make_face()
    extrude(amount=2.922144385, mode=Mode.SUBTRACT)
    with BuildSketch(Plane(origin=(1.172144385, 9, -1.7), x_dir=(0, 0, -1), z_dir=(-1, 0, 0))) as fillet1_3_piece_9:
        with BuildLine():
            CenterArc((2 + FILLET1_R, FILLET1_R), FILLET1_R, 180, 90)
            Line((2 + FILLET1_R, 0), (2, 0))
            Line((2, 0), (2, FILLET1_R))
        make_face()
    revolve(axis=Axis((1.172144385, 9, -1.7), (0, -1, 0)), revolution_arc=90, mode=Mode.SUBTRACT)
    with BuildSketch(Plane(origin=(1.172144385, 9, -28.3), x_dir=(1, 0, 0), z_dir=(0, 0, -1))) as fillet1_3_piece_10:
        with BuildLine():
            CenterArc((2 + FILLET1_R, FILLET1_R), FILLET1_R, 180, 90)
            Line((2 + FILLET1_R, 0), (2, 0))
            Line((2, 0), (2, FILLET1_R))
        make_face()
    revolve(axis=Axis((1.172144385, 9, -28.3), (0, -1, 0)), revolution_arc=90, mode=Mode.SUBTRACT)
    with BuildSketch(Plane(origin=(49.635791926, 9, -1.7), x_dir=(0, 0, -1), z_dir=(1, 0, 0))) as fillet1_3_piece_11:
        with BuildLine():
            CenterArc((2 + FILLET1_R, -FILLET1_R), FILLET1_R, 90, 90)
            Line((2 + FILLET1_R, 0), (2, 0))
            Line((2, 0), (2, -FILLET1_R))
        make_face()
    revolve(axis=Axis((49.635791926, 9, -1.7), (0, 1, 0)), revolution_arc=90, mode=Mode.SUBTRACT)
    with BuildSketch(Plane(origin=(49.635791926, 9, -28.3), x_dir=(-1, 0, 0), z_dir=(0, 0, -1))) as fillet1_3_piece_12:
        with BuildLine():
            CenterArc((2 + FILLET1_R, -FILLET1_R), FILLET1_R, 90, 90)
            Line((2 + FILLET1_R, 0), (2, 0))
            Line((2, 0), (2, -FILLET1_R))
        make_face()
    revolve(axis=Axis((49.635791926, 9, -28.3), (0, 1, 0)), revolution_arc=90, mode=Mode.SUBTRACT)

    # Fillet2
    fillet2_edges = [part_1.edges().sort_by_distance(p)[0] for p in [
        (5, 7, -15),
    ]]
    fillet(fillet2_edges, radius=FILLET2_R)
    fillet2_2_edges = [part_1.edges().sort_by_distance(p)[0] for p in [
        (41.835786438, 7, -31.414213562),
        (41.25, 7, -15),
        (41.835786438, 7, 1.414213562),
    ]]
    fillet(fillet2_2_edges, radius=FILLET2_R)

    # Fillet3
    fillet3_edges = [part_1.edges().sort_by_distance(p)[0] for p in [
        (47.635791926, 4.5, -32),
        (25.403968156, 9, -32),
        (25.403968156, 9, 2),
        (3.172144385, 4.5, -32),
        (3.757930823, 8.414213562, -32),
        (47.050005489, 8.414213562, -32),
        (47.635791926, 4.5, 2),
        (3.172144385, 4.5, 2),
        (3.757930823, 8.414213562, 2),
        (47.050005489, 8.414213562, 2),
        (23.296572875, 7, 2),
        (23.296572875, 7, -32),
        (5, 1.5, -32),
        (5, 1.5, 2),
        (40.905038013, 5.735944596, 2),
        (40.905038041, 5.735944573, -32),
        (6.171572875, 5.828427125, -32),
        (6.171572875, 5.828427125, 2),
    ]]
    fillet(fillet3_edges, radius=FILLET3_R)

    # Draft4
    draft4_faces = [part_1.faces().sort_by_distance(p)[0] for p in [
        (10, 11, -0.9),
        (40, 11, -0.9),
        (40, 11, -30.9),
        (10, 11, -30.9),
    ]]
    draft(draft4_faces, Plane(origin=(10, 13, -30), x_dir=(0, 0, 1), z_dir=(0, 1, 0)), DRAFT4_ANGLE)

    # Fillet4
    fillet4_edges = [part_1.edges().sort_by_distance(p)[0] for p in [
        (10, 13, -0.9),
        (40, 13, -0.9),
        (40, 13, -30.9),
        (10, 13, -30.9),
    ]]
    fillet(fillet4_edges, radius=FILLET4_R)


solid = part_1.part
